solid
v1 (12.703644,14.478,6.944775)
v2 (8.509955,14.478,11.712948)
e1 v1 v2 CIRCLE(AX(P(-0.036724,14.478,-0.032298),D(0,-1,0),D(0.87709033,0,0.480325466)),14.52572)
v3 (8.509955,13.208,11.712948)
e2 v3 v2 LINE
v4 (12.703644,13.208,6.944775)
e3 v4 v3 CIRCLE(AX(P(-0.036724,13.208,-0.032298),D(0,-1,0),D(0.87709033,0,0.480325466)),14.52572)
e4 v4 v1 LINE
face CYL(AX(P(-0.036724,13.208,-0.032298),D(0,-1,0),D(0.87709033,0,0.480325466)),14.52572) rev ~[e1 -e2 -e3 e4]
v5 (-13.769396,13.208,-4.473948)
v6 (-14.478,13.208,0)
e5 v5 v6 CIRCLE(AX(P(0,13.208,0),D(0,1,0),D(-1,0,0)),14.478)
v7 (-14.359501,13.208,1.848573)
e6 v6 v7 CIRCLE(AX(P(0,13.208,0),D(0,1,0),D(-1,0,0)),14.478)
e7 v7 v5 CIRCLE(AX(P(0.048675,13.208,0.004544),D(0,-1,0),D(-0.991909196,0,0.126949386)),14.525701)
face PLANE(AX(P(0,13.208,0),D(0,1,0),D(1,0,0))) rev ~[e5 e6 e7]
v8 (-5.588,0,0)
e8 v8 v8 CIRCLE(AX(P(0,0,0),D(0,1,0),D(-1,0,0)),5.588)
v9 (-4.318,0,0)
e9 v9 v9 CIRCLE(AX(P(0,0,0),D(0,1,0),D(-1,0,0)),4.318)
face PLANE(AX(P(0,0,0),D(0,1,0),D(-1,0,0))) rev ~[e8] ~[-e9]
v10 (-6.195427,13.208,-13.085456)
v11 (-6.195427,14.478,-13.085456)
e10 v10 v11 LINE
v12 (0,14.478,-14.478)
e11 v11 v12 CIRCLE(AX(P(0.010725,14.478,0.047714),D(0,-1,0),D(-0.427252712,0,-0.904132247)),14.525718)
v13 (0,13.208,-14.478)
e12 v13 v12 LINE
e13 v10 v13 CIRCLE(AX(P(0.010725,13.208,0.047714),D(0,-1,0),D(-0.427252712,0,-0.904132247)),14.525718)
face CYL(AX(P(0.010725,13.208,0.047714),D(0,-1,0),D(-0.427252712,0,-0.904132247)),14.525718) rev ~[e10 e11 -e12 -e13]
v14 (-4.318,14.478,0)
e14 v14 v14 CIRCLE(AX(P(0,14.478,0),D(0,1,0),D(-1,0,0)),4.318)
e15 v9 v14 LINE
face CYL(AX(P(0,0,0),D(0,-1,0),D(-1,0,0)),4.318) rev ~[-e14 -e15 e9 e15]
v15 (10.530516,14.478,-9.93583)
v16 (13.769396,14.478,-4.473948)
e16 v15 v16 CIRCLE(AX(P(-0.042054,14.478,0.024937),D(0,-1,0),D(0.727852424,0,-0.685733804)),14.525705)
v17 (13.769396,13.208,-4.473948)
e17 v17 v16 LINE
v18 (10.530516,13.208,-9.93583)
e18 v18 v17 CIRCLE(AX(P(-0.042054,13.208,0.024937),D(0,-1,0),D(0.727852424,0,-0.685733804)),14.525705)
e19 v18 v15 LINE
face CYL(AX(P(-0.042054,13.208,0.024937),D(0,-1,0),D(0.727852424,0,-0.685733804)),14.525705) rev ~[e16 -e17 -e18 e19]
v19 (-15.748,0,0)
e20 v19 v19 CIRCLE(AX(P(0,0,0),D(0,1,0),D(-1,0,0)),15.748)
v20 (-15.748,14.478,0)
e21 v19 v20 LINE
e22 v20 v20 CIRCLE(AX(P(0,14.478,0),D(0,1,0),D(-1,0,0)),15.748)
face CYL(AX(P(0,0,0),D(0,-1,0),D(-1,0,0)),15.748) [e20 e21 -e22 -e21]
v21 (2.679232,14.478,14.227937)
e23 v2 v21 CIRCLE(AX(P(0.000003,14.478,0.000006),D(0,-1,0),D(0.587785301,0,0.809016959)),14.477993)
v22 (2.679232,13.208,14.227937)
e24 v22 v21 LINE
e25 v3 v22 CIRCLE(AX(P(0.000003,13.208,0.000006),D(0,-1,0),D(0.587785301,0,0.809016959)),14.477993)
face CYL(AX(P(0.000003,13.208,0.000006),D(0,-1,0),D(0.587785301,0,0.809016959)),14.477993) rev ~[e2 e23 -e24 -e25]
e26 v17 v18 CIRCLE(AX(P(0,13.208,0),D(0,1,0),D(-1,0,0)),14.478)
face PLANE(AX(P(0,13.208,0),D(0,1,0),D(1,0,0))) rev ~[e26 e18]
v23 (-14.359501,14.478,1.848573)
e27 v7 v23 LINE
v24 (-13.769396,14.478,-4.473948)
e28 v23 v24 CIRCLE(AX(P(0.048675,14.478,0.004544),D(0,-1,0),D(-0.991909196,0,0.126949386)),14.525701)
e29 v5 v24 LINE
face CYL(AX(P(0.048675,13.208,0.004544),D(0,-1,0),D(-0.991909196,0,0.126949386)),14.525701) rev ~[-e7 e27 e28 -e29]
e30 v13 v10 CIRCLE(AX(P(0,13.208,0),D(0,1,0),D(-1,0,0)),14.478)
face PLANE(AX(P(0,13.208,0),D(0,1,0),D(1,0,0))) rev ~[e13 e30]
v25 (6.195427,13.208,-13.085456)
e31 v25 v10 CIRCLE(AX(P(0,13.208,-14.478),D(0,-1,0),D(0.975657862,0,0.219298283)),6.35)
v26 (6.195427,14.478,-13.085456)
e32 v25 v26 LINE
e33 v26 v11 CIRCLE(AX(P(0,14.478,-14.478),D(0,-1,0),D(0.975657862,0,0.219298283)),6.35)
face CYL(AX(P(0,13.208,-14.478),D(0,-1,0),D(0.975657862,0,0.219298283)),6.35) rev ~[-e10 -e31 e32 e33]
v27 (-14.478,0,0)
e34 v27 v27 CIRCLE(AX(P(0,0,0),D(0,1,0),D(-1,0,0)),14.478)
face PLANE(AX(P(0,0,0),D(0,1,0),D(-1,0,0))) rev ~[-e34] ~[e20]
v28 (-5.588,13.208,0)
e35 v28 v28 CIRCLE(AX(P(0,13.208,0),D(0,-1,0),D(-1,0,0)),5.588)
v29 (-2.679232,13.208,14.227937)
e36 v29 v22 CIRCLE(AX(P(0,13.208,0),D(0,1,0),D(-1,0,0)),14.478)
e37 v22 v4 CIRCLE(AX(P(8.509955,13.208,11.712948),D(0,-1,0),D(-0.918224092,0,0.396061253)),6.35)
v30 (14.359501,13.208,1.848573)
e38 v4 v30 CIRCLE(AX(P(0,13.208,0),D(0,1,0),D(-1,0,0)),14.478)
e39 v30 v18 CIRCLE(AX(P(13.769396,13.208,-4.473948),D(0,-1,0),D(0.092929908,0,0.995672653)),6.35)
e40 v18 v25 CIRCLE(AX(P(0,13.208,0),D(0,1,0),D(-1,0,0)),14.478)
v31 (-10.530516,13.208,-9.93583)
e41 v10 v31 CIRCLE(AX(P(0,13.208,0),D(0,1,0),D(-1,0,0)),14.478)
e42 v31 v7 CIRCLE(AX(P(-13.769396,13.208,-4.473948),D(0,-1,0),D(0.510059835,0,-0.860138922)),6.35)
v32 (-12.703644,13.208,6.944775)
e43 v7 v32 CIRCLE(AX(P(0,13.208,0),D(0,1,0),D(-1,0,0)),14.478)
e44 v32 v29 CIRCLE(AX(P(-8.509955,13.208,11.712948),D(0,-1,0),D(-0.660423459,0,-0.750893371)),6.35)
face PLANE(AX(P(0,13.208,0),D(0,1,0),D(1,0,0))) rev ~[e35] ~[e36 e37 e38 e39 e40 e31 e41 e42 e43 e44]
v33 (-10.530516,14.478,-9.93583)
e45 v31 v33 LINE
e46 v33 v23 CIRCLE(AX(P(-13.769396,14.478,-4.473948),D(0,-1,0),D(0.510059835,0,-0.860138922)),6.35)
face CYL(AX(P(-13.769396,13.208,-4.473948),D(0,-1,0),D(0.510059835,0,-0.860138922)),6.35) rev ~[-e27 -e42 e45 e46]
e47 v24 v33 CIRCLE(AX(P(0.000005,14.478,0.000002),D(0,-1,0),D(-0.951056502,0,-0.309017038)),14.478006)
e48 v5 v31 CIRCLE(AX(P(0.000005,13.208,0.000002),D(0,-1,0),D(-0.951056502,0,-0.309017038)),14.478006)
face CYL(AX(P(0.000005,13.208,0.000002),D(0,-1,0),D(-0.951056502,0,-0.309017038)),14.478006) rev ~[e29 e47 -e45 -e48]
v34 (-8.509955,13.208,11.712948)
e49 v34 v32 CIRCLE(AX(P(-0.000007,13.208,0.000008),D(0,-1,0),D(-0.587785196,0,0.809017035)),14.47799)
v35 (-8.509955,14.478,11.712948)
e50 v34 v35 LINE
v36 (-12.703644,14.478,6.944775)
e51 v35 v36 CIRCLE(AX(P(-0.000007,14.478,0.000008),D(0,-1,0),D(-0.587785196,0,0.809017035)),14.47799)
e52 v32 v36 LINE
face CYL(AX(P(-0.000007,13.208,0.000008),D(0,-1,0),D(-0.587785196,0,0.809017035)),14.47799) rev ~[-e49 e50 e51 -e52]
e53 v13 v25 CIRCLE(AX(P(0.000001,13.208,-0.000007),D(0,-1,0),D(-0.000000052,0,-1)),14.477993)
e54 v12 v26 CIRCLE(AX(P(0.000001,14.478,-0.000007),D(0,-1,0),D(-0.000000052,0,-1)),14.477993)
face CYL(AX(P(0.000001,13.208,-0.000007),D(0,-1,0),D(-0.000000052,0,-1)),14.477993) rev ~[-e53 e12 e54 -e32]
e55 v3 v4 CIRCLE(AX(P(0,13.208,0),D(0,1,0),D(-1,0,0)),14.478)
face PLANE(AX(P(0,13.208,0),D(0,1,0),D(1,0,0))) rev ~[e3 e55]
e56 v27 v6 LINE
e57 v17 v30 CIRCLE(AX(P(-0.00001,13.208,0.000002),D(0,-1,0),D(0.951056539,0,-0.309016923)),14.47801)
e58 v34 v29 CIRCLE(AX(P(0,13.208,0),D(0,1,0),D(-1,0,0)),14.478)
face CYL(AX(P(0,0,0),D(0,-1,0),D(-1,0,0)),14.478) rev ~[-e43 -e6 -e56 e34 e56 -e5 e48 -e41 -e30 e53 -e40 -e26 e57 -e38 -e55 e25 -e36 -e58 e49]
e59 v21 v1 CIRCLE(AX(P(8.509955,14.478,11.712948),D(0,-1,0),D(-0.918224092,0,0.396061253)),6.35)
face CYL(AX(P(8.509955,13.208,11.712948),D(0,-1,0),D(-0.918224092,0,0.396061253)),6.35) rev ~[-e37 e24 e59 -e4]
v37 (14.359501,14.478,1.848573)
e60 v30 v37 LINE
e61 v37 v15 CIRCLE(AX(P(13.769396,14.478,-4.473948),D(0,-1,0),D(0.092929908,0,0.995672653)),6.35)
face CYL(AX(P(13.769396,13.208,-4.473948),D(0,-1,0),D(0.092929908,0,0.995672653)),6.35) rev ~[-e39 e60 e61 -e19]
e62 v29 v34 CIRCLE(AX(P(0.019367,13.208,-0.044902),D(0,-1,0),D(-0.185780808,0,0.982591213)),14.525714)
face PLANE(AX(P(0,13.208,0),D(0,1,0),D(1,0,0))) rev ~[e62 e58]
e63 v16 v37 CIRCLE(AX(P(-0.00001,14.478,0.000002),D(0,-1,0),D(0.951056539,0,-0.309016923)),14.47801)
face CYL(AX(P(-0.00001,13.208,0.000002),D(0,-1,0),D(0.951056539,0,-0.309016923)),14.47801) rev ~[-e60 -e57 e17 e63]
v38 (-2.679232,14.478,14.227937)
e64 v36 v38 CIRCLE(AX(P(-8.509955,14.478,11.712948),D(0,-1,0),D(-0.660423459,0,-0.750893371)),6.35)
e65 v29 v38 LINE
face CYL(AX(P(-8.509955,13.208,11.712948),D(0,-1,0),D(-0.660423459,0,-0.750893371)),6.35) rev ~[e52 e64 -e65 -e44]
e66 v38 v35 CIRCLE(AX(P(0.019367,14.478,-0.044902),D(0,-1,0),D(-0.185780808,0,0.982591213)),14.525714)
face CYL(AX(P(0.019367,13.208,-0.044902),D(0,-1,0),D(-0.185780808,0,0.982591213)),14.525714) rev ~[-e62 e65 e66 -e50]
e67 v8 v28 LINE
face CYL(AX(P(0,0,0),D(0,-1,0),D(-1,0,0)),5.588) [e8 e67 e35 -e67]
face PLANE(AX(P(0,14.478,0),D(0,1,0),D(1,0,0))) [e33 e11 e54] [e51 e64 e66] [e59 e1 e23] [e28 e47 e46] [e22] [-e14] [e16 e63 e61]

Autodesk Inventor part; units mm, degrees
ref_plane "YZ Plane" through (0, 0, 0) normal (1, 0, 0) x (0, 1, 0)
ref_plane "XZ Plane" through (0, 0, 0) normal (0, 1, 0) x (-1, 0, 0)
ref_plane "XY Plane" through (0, 0, 0) normal (0, 0, 1) x (1, 0, 0)
sketch "Sketch1" plane through (0, 0, 0) normal (0, 1, 0) x (-1, 0, 0)
  circle A0 centre (0, 0) radius 5.588
  circle A1 centre (0, 0) radius 4.318
  circle A2 centre (0, 0) radius 14.478
  circle A3 centre (0, 0) radius 15.748
  dimension "d0" = 11.176
  dimension "d1" = 8.636
  dimension "d2" = 28.956
  dimension "d3" = 31.496
extrude "Extrusion1" add sketch "Sketch1" along normal blind 14.478
sketch "Sketch2" plane through (0, 14.478, 0) normal (0, 1, 0) x (1, 0, 0)
  circle A0 centre (0, 0) radius 14.478
  circle A1 centre (0, 0) radius 5.588
extrude "Extrusion2" add sketch "Sketch2" against normal blind 1.27
sketch "Sketch3" plane through (0, 13.208, 0) normal (0, -1, 0) x (1, 0, 0)
  circle A0 centre (0, 0) radius 14.478
  arc A1 (6.197477, -13.094605) -> (-6.195427, -13.085456) centre (0, -14.478) ccw
  arc A2 (-6.195427, -13.085456) -> (6.197477, -13.094605) centre (0.010723, 0.047707) ccw
  circle A3 centre (0, 0) radius 14.478
  circle A4 centre (0, 0) radius 5.588
  arc A5 (14.368835, 1.847695) -> (10.530516, -9.93583) centre (13.769396, -4.473948) ccw
  arc A6 (10.530516, -9.93583) -> (14.368835, 1.847695) centre (-0.042059, 0.024941) ccw
  arc A7 (2.682952, 14.236543) -> (12.703644, 6.944775) centre (8.509955, 11.712948) ccw
  arc A8 (12.703644, 6.944775) -> (2.682952, 14.236543) centre (-0.036717, -0.032293) ccw
  arc A9 (-12.71068, 6.950972) -> (-2.679232, 14.227937) centre (-8.509955, 11.712948) ccw
  arc A10 (-2.679232, 14.227937) -> (-12.71068, 6.950972) centre (0.019366, -0.044899) ccw
  arc A11 (-10.538584, -9.940606) -> (-14.359501, 1.848573) centre (-13.769396, -4.473948) ccw
  arc A12 (-14.359501, 1.848573) -> (-10.538584, -9.940606) centre (0.048686, 0.004544) ccw
  point P0 (-8.509955, 11.712948)
  point P1 (-12.703644, 6.944775)
  point P2 (8.509955, 11.712948)
  point P3 (2.679232, 14.227937)
  point P4 (-10.530516, -9.93583)
  point P5 (6.195427, -13.085456)
  point P6 (13.769396, -4.473948)
  point P7 (14.359501, 1.848573)
  dimension "d8" = 6.35
  dimension "d11" = 360
sketch "Sketch3 outline for Extrusion3" plane through (0, 13.208, 0) normal (0, -1, 0) x (1, 0, 0)
  arc A0 (-2.679232, 14.227937) -> (-8.509955, 11.712948) centre (0.019366, -0.044899) ccw
  arc A1 (-12.703644, 6.944775) -> (-2.679232, 14.227937) centre (-8.509955, 11.712948) ccw
  arc A2 (-8.509955, 11.712948) -> (-12.703644, 6.944775) centre (0, 0) ccw
  arc A3 (12.703644, 6.944775) -> (8.509955, 11.712948) centre (-0.036717, -0.032293) ccw
  arc A4 (2.679232, 14.227937) -> (12.703644, 6.944775) centre (8.509955, 11.712948) ccw
  arc A5 (8.509955, 11.712948) -> (2.679232, 14.227937) centre (0, 0) ccw
  arc A6 (-14.359501, 1.848573) -> (-13.769396, -4.473948) centre (0.048686, 0.004544) ccw
  arc A7 (-10.530516, -9.93583) -> (-14.359501, 1.848573) centre (-13.769396, -4.473948) ccw
  arc A8 (-13.769396, -4.473948) -> (-10.530516, -9.93583) centre (0, 0) ccw
  arc A9 (-6.195427, -13.085456) -> (0, -14.478) centre (0.010723, 0.047707) ccw
  arc A10 (6.195427, -13.085456) -> (-6.195427, -13.085456) centre (0, -14.478) ccw
  arc A11 (0, -14.478) -> (6.195427, -13.085456) centre (0, 0) ccw
  arc A12 (10.530516, -9.93583) -> (13.769396, -4.473948) centre (-0.042059, 0.024941) ccw
  arc A13 (14.359501, 1.848573) -> (10.530516, -9.93583) centre (13.769396, -4.473948) ccw
  arc A14 (13.769396, -4.473948) -> (14.359501, 1.848573) centre (0, 0) ccw
extrude "Extrusion3" cut sketch "Sketch3 outline for Extrusion3" against normal blind 25.4
sketch "Sketch4" plane through (0, 13.208, 0) normal (0, -1, 0) x (1, 0, 0)
  point P0 (0, 0)
properties part number "WheelGBR"
